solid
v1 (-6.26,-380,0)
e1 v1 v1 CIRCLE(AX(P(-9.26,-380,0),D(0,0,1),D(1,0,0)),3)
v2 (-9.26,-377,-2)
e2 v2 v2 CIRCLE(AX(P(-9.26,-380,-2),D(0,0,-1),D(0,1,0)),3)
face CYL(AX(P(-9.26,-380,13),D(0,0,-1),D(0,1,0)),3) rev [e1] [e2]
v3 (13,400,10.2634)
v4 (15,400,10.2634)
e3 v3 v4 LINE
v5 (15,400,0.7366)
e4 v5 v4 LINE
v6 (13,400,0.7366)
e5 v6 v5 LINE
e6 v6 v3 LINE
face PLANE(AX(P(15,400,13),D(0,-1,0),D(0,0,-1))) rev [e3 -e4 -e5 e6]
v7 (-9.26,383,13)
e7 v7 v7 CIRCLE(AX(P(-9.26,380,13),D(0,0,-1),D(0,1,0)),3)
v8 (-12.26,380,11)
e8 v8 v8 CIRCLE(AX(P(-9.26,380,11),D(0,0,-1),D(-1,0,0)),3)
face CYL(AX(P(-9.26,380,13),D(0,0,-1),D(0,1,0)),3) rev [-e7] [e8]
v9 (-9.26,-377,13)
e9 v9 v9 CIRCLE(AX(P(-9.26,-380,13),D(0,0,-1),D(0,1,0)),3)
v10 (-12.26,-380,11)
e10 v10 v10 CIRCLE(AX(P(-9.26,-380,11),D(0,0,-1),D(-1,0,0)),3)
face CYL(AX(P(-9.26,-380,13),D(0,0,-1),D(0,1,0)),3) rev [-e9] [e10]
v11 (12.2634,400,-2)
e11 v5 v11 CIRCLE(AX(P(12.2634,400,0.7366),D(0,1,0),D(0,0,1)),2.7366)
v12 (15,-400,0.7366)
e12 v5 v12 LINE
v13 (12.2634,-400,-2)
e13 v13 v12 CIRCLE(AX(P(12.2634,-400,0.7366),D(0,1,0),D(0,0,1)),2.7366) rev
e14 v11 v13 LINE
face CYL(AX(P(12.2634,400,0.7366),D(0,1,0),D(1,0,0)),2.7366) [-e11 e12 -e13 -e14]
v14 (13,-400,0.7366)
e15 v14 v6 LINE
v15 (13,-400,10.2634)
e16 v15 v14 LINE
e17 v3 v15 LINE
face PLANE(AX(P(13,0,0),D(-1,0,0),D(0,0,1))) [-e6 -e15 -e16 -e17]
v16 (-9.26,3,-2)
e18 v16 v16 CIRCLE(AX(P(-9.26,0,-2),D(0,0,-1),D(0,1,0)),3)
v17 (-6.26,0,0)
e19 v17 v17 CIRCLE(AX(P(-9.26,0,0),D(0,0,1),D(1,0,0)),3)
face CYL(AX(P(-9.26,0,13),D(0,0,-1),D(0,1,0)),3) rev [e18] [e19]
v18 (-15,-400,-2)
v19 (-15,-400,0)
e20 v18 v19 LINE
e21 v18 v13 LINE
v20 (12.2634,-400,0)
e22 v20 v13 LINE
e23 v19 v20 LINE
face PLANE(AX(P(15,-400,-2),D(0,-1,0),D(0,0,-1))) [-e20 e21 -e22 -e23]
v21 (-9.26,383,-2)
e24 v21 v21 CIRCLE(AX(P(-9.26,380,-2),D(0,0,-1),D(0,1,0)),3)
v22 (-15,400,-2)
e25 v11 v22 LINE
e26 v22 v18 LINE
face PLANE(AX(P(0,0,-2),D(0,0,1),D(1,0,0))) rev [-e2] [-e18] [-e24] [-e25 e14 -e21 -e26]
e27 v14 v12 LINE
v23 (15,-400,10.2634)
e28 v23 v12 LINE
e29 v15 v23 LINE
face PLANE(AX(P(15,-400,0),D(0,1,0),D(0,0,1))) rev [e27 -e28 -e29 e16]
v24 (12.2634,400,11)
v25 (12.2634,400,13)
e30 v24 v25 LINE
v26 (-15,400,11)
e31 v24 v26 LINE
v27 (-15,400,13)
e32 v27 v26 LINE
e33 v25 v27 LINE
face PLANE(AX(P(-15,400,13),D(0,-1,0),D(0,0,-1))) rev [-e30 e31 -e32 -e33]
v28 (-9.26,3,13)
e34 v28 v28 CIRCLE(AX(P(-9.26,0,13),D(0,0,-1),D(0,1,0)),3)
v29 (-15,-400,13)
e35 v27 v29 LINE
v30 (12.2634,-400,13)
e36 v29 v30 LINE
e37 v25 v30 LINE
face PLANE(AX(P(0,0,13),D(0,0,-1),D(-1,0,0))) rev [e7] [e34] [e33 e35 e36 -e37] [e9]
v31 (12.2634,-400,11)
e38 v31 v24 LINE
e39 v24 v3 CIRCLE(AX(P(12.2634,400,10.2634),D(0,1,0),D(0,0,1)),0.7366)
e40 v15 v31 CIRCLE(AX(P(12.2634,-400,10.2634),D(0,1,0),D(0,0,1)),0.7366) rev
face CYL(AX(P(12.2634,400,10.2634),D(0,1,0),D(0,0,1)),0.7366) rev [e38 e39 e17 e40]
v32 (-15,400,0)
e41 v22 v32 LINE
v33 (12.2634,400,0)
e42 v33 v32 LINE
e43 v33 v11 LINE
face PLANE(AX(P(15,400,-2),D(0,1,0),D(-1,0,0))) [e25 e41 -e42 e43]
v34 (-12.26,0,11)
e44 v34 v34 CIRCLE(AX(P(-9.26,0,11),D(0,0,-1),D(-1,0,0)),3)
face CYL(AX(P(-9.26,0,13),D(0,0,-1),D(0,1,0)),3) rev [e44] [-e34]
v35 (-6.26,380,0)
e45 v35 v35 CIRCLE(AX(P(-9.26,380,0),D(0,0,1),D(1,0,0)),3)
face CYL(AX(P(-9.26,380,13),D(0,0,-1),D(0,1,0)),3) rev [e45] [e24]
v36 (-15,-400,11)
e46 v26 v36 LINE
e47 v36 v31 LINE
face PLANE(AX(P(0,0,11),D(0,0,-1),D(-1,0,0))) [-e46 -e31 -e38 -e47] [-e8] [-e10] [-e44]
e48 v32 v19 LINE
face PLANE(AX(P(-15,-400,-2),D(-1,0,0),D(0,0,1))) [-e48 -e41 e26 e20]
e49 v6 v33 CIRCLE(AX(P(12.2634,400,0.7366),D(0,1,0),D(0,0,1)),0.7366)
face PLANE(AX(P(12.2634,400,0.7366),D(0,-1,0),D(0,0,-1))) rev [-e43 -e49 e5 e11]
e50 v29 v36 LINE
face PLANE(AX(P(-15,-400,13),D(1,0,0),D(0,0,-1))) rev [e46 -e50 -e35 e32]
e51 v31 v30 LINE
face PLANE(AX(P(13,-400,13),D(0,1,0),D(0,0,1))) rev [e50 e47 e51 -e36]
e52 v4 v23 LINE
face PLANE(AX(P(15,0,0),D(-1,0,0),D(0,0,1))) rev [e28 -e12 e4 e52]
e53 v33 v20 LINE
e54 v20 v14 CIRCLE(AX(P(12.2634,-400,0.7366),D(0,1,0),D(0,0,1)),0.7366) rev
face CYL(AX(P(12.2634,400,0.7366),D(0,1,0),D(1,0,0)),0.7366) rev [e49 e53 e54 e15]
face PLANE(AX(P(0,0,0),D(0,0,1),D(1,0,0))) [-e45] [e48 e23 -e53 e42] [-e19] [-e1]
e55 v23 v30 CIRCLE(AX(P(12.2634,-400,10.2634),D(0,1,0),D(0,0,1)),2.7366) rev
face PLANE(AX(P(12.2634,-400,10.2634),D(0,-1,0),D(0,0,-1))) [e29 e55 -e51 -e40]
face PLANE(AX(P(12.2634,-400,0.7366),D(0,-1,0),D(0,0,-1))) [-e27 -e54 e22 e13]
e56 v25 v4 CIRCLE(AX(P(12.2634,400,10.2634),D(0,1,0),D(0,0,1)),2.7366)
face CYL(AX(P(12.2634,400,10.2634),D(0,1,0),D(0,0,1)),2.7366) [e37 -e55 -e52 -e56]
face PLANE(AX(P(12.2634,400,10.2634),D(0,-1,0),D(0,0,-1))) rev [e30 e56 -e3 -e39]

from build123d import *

# Parameters (mm, degrees)
SKETCH1_W                    = 30
SKETCH1_H                    = 800
BASE_FLANGE1_DEPTH           = 2
EDGE_FLANGE1_STRIP_W         = 9.4732
EDGE_FLANGE1_STRIP_H         = 2
EDGE_FLANGE1_STRIP_CUT_DEPTH = 800
EDGE_FLANGE1_DEPTH           = 800
EDGE_FLANGE2_STRIP_W         = 9.4732
EDGE_FLANGE2_STRIP_H         = 2
EDGE_FLANGE2_STRIP_CUT_DEPTH = 800
EDGE_FLANGE2_DEPTH           = 800
SKETCH12_R                   = 3
CUT_EXTRUDE1_DEPTH           = 401.562105047


# Sheet-metal steps are written as plain solids
with BuildPart() as part:
    # Sketch1 → Base-Flange1 (new body)
    with BuildSketch(Plane.XY):
        Rectangle(SKETCH1_W, SKETCH1_H)
    extrude(amount=-BASE_FLANGE1_DEPTH)

    # Edge-Flange1 strip (across the edge) → Edge-Flange1 strip cut (cut)
    with BuildSketch(Plane(origin=(15, -400, 0), x_dir=(-1, 0, 0), z_dir=(0, 1, 0))):
        with Locations((-2, -1)):
            Rectangle(EDGE_FLANGE1_STRIP_W, EDGE_FLANGE1_STRIP_H)
    extrude(amount=EDGE_FLANGE1_STRIP_CUT_DEPTH, mode=Mode.SUBTRACT)

    # Edge-Flange1 section (across the edge) → Edge-Flange1 (add)
    with BuildSketch(Plane(origin=(15, -400, 0), x_dir=(-1, 0, 0), z_dir=(0, 1, 0))):
        with BuildLine():
            Line((0, 0.7366), (0, 13))
            Line((0, 13), (2, 13))
            Line((2, 13), (2, 0.7366))
            ThreePointArc((2, 0.7366), (2.215745145, 0.215745145), (2.7366, 0))
            Line((2.7366, 0), (2.7366, -2))
            ThreePointArc((2.7366, -2), (0.801531583, -1.198468417), (0, 0.7366))
        make_face()
    extrude(amount=EDGE_FLANGE1_DEPTH)

    # Edge-Flange2 strip (across the edge) → Edge-Flange2 strip cut (cut)
    with BuildSketch(Plane(origin=(13, -400, 13), x_dir=(0, 0, -1), z_dir=(0, 1, 0))):
        with Locations((-2, -1)):
            Rectangle(EDGE_FLANGE2_STRIP_W, EDGE_FLANGE2_STRIP_H)
    extrude(amount=EDGE_FLANGE2_STRIP_CUT_DEPTH, mode=Mode.SUBTRACT)

    # Edge-Flange2 section (across the edge) → Edge-Flange2 (add)
    with BuildSketch(Plane(origin=(13, -400, 13), x_dir=(0, 0, -1), z_dir=(0, 1, 0))):
        with BuildLine():
            Line((0, 0.7366), (0, 28))
            Line((0, 28), (2, 28))
            Line((2, 28), (2, 0.7366))
            ThreePointArc((2, 0.7366), (2.215745145, 0.215745145), (2.7366, 0))
            Line((2.7366, 0), (2.7366, -2))
            ThreePointArc((2.7366, -2), (0.801531583, -1.198468417), (0, 0.7366))
        make_face()
    extrude(amount=EDGE_FLANGE2_DEPTH)

    # Sketch12 → Cut-Extrude1 (cut, through all)
    with BuildSketch(Plane(origin=(0, 0, -2), x_dir=(-1, 0, 0), z_dir=(0, 0, -1))):
        with Locations(Location((9.26, 380, 0), (0, 0, 90))):
            Circle(SKETCH12_R)
        with Locations(Location((9.26, 0, 0), (0, 0, 90))):
            Circle(SKETCH12_R)
        with Locations(Location((9.26, -380, 0), (0, 0, 90))):
            Circle(SKETCH12_R)
    extrude(amount=-CUT_EXTRUDE1_DEPTH, mode=Mode.SUBTRACT)


solid = part.part
